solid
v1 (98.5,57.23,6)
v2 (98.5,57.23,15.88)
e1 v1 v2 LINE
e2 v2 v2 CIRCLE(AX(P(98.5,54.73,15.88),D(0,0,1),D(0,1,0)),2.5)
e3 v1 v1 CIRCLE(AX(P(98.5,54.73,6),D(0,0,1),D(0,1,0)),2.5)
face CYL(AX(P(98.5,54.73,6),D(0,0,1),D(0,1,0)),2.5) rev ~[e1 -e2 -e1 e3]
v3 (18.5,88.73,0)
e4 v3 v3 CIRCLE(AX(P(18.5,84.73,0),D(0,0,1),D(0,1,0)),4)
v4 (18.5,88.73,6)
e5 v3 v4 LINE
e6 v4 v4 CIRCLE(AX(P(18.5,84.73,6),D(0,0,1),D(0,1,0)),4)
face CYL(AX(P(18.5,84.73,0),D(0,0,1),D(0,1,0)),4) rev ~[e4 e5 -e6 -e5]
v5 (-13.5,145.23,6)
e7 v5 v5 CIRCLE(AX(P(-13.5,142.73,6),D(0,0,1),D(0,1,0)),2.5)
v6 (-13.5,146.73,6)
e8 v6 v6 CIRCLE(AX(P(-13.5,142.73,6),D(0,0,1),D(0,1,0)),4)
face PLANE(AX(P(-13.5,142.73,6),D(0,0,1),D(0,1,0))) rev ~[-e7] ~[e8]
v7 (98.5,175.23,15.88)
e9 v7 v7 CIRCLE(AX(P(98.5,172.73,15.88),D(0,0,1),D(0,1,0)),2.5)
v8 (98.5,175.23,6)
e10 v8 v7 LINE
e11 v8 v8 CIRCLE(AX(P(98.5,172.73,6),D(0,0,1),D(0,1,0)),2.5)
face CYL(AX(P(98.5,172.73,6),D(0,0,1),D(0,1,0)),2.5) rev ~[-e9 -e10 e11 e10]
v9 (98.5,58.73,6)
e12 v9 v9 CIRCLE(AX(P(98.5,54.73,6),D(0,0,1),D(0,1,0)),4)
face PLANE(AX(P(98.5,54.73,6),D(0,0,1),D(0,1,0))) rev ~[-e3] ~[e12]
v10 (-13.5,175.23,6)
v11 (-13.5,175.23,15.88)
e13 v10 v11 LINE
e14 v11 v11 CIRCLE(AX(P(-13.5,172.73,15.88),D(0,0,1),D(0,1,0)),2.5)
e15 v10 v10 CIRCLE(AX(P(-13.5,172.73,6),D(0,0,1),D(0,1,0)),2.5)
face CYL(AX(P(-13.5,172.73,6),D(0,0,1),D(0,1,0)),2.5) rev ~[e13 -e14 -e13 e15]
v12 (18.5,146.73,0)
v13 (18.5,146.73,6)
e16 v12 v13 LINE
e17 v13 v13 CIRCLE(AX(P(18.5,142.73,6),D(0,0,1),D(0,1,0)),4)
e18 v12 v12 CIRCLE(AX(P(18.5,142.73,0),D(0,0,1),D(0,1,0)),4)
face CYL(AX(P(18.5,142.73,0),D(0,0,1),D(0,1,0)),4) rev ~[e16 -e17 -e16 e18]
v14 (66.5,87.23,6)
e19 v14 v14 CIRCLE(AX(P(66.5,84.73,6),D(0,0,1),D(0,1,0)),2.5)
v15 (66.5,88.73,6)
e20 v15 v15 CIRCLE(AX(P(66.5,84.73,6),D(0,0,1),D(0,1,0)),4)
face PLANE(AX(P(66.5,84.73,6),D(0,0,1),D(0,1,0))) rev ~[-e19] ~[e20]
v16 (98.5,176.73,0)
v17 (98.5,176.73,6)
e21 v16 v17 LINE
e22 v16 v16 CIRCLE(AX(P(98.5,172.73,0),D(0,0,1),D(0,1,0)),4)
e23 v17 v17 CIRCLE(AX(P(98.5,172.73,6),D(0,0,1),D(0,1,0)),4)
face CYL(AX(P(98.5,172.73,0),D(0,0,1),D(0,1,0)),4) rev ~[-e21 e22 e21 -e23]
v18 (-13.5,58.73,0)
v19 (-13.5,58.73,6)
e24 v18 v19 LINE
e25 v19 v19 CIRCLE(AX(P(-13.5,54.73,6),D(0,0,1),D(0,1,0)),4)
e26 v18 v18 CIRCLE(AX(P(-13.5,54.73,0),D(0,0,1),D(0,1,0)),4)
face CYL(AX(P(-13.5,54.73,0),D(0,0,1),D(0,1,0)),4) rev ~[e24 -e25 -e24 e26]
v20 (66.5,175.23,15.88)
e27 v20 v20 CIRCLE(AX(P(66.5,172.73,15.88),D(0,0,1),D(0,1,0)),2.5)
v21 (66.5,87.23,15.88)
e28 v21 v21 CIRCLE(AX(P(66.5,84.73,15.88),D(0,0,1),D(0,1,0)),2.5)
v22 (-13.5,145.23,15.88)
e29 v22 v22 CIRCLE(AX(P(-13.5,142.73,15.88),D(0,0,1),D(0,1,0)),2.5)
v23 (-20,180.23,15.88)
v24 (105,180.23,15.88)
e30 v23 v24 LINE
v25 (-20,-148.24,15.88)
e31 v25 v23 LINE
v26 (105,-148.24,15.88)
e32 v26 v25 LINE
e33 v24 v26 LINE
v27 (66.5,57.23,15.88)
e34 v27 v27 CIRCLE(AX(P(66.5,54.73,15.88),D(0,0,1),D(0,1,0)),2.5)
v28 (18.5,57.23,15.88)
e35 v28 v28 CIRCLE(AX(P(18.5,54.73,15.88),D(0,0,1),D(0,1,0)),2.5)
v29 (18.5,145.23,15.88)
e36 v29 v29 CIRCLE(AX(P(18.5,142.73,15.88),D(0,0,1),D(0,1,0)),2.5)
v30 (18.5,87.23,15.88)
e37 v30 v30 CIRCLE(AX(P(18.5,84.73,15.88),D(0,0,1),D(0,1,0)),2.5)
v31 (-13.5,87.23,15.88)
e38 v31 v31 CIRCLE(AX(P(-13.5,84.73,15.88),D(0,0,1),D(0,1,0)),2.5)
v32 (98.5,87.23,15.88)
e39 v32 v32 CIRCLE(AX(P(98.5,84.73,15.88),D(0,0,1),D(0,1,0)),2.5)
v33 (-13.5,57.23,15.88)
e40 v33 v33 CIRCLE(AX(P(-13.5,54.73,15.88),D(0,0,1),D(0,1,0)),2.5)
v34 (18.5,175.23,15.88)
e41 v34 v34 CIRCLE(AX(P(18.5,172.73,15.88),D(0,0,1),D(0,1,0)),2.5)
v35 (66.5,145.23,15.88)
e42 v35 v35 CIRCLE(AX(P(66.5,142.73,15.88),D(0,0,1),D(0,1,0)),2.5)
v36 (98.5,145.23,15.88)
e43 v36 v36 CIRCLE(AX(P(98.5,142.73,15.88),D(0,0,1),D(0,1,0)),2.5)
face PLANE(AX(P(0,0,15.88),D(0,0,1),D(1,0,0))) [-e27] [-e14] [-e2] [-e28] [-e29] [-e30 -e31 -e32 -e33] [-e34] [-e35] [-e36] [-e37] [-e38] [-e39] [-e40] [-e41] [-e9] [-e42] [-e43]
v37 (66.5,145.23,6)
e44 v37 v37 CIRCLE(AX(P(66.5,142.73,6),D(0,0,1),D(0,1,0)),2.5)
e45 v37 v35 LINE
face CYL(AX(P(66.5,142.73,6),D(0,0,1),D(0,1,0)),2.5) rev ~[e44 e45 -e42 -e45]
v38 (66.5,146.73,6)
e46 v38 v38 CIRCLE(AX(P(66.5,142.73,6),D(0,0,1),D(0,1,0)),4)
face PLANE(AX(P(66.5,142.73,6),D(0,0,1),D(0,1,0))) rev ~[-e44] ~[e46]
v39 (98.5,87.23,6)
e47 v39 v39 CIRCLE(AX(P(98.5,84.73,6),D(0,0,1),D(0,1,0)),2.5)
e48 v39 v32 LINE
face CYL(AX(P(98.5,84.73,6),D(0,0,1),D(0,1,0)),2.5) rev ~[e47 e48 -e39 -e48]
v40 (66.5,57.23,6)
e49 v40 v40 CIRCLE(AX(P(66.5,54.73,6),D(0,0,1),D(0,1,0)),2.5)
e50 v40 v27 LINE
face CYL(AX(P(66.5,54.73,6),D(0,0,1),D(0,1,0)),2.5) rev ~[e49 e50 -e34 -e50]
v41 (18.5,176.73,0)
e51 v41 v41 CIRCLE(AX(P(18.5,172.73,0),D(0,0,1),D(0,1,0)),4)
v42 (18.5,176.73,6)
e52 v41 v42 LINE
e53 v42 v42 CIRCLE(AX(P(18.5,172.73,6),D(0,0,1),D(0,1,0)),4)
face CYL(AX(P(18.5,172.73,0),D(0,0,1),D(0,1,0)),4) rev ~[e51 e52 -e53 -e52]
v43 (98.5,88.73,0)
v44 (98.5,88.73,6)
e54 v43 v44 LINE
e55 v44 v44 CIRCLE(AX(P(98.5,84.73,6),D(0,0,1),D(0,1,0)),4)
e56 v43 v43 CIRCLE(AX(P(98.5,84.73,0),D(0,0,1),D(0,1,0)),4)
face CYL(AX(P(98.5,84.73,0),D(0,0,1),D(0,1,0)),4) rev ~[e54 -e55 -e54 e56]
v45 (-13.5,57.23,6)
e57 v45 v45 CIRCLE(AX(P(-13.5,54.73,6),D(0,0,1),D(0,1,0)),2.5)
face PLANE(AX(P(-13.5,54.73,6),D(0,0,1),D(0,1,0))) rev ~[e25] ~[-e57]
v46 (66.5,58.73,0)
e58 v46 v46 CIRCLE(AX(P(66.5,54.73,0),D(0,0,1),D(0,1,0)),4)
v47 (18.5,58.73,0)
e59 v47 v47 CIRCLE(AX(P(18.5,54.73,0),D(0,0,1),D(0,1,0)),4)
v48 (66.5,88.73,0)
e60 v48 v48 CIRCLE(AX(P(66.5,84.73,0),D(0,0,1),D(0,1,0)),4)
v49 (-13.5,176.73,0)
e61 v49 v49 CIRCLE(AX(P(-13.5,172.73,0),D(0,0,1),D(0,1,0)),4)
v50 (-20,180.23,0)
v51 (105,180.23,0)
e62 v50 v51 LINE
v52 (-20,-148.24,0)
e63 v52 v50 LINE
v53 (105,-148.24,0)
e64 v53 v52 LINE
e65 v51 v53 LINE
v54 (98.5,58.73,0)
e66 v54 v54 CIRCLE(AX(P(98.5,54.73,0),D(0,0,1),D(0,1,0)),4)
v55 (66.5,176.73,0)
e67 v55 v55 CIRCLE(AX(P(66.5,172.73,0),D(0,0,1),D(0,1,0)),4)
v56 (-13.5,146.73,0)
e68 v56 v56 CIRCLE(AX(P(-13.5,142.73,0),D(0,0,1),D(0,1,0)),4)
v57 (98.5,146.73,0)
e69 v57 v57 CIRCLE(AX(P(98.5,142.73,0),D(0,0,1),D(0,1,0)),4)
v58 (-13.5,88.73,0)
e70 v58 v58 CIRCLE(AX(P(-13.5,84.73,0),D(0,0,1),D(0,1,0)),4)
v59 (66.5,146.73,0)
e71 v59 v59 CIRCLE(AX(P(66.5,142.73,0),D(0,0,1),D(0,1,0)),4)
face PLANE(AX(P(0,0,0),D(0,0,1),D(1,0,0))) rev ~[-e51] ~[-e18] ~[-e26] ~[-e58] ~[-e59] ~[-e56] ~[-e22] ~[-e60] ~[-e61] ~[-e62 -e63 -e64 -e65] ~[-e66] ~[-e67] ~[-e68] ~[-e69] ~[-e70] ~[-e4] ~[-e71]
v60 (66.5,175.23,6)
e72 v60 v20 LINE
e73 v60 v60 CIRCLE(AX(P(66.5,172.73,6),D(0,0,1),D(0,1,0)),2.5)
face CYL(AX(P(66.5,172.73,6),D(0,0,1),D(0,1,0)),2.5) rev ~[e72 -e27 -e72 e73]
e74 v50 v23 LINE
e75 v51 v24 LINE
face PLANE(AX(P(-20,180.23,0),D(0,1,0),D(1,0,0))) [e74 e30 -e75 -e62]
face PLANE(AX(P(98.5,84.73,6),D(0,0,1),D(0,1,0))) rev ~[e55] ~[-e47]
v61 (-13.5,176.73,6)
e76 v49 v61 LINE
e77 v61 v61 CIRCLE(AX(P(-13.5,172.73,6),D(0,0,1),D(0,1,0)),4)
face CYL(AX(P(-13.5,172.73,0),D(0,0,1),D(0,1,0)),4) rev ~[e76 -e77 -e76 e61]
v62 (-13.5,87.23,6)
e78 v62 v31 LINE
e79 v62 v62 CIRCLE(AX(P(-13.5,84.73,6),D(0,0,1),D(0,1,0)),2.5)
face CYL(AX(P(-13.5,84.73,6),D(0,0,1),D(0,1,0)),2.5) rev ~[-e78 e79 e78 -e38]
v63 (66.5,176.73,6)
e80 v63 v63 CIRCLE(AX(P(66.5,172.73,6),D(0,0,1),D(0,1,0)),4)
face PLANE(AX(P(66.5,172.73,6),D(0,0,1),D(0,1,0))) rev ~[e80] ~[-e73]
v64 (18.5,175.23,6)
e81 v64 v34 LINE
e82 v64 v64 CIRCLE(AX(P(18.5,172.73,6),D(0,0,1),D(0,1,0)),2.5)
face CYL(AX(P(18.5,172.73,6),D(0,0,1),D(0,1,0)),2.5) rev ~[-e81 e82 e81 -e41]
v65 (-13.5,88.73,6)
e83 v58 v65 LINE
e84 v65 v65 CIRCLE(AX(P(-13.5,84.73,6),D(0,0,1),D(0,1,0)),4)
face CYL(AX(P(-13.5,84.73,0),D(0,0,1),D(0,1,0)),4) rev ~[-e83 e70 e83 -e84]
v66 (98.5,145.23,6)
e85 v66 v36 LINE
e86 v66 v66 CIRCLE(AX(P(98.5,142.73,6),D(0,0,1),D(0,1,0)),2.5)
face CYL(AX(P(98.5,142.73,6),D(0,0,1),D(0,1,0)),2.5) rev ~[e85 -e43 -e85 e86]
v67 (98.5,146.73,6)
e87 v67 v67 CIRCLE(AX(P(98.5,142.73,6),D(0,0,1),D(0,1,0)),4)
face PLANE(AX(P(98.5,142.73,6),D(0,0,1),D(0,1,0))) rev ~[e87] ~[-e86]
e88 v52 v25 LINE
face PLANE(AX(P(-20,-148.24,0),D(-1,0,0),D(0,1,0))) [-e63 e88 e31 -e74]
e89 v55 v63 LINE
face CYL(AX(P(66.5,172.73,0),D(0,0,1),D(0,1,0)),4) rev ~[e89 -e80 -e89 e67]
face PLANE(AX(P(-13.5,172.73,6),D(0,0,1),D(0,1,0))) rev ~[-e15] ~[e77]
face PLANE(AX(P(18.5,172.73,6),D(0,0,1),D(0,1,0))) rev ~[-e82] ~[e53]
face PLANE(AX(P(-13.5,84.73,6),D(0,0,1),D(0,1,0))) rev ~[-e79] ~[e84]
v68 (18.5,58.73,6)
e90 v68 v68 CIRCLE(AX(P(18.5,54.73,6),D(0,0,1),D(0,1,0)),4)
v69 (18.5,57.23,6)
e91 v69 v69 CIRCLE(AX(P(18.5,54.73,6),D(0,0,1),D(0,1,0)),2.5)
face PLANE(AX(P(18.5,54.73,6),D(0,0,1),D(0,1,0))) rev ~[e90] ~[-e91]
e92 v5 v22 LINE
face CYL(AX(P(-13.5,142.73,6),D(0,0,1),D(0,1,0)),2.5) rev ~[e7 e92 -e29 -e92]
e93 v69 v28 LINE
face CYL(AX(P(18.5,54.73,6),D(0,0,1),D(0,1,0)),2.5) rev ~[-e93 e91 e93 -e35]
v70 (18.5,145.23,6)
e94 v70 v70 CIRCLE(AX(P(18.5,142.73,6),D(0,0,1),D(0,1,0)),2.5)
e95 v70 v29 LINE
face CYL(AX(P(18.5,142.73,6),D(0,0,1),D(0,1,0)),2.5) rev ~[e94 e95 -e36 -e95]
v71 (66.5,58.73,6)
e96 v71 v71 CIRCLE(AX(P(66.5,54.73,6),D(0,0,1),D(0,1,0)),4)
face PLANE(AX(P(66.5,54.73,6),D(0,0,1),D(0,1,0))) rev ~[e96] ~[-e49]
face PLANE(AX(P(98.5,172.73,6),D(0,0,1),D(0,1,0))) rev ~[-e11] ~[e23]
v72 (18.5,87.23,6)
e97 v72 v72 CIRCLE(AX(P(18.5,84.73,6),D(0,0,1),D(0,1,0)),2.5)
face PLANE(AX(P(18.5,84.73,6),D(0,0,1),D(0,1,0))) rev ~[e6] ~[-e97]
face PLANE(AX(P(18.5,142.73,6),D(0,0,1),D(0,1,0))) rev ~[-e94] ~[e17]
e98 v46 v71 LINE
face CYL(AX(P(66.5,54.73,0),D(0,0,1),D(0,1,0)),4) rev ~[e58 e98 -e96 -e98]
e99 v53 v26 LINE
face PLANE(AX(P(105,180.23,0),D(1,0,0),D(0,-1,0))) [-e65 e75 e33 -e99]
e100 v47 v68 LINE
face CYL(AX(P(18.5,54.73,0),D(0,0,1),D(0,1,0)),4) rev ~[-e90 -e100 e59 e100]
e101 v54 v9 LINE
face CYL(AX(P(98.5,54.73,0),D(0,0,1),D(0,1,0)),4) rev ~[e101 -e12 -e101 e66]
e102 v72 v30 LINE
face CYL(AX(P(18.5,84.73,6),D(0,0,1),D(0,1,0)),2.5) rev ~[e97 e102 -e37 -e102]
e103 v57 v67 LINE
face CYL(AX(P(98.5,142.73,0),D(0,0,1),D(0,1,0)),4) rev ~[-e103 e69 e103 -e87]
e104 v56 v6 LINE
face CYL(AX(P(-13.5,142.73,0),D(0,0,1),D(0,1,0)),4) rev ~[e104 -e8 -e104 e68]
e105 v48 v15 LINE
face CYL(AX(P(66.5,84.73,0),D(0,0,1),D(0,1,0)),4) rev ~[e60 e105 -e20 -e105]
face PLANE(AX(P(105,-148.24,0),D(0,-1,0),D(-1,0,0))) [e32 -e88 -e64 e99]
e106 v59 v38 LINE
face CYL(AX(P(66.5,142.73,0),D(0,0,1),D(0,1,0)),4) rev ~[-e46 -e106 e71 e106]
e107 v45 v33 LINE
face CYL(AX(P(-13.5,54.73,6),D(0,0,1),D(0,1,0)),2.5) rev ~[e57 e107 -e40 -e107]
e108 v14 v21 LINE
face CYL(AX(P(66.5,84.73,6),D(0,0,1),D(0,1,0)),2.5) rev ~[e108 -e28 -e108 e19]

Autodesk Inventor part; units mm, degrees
ref_plane "YZ Plane" through (0, 0, 0) normal (1, 0, 0) x (0, 1, 0)
ref_plane "XZ Plane" through (0, 0, 0) normal (0, 1, 0) x (-1, 0, 0)
ref_plane "XY Plane" through (0, 0, 0) normal (0, 0, 1) x (1, 0, 0)
sketch "Esboço1" plane through (0, 0, 0) normal (0, 0, 1) x (1, 0, 0)
  line L0 (-20, 180.23) -> (105, 180.23)
  line L1 (105, 180.23) -> (105, -148.24)
  line L2 (105, -148.24) -> (-20, -148.24)
  line L3 (-20, -148.24) -> (-20, 180.23)
  dimension "d0" = 125
  dimension "d1" = 328.47
extrude "Extrusão1" add sketch "Esboço1" along normal blind 15.88
sketch "Esboço3" plane through (0, 0, 0) normal (0, 0, -1) x (-1, 0, 0)
  circle A0 centre (-18.5, 54.73) radius 2.9 construction
  circle A1 centre (13.5, 54.73) radius 2.9 construction
  circle A2 centre (-66.5, 54.73) radius 2.9 construction
  circle A3 centre (-98.5, 54.73) radius 2.9 construction
  circle A4 centre (-98.5, 84.73) radius 2.9 construction
  circle A5 centre (-66.5, 84.73) radius 2.9 construction
  circle A6 centre (-18.5, 84.73) radius 2.9 construction
  circle A7 centre (13.5, 84.73) radius 2.9 construction
  circle A8 centre (-18.5, 172.73) radius 2.9 construction
  circle A9 centre (13.5, 172.73) radius 2.9 construction
  circle A10 centre (13.5, 142.73) radius 2.9 construction
  circle A11 centre (-18.5, 142.73) radius 2.9 construction
  circle A12 centre (-66.5, 172.73) radius 2.9 construction
  circle A13 centre (-98.5, 172.73) radius 2.9 construction
  circle A14 centre (-98.5, 142.73) radius 2.9 construction
  circle A15 centre (-66.5, 142.73) radius 2.9 construction
  point P0 (0, 0)
hole "Furo1" at (66.5, 142.73, 0) at (-13.5, 142.73, 0) at (18.5, 142.73, 0) at (-13.5, 172.73, 0) at (18.5, 172.73, 0) at (98.5, 142.73, 0) at (66.5, 172.73, 0) at (98.5, 172.73, 0) at (18.5, 84.73, 0) at (98.5, 84.73, 0) at (98.5, 54.73, 0) at (66.5, 54.73, 0) at (-13.5, 84.73, 0) at (18.5, 54.73, 0) at (-13.5, 54.73, 0) at (66.5, 84.73, 0) direction (0, 0, 1) diameter 5 end through all counterbore diameter 8 counterbore depth 6
properties part number "BLOCO_SUPORTE_EIXO_Z"
